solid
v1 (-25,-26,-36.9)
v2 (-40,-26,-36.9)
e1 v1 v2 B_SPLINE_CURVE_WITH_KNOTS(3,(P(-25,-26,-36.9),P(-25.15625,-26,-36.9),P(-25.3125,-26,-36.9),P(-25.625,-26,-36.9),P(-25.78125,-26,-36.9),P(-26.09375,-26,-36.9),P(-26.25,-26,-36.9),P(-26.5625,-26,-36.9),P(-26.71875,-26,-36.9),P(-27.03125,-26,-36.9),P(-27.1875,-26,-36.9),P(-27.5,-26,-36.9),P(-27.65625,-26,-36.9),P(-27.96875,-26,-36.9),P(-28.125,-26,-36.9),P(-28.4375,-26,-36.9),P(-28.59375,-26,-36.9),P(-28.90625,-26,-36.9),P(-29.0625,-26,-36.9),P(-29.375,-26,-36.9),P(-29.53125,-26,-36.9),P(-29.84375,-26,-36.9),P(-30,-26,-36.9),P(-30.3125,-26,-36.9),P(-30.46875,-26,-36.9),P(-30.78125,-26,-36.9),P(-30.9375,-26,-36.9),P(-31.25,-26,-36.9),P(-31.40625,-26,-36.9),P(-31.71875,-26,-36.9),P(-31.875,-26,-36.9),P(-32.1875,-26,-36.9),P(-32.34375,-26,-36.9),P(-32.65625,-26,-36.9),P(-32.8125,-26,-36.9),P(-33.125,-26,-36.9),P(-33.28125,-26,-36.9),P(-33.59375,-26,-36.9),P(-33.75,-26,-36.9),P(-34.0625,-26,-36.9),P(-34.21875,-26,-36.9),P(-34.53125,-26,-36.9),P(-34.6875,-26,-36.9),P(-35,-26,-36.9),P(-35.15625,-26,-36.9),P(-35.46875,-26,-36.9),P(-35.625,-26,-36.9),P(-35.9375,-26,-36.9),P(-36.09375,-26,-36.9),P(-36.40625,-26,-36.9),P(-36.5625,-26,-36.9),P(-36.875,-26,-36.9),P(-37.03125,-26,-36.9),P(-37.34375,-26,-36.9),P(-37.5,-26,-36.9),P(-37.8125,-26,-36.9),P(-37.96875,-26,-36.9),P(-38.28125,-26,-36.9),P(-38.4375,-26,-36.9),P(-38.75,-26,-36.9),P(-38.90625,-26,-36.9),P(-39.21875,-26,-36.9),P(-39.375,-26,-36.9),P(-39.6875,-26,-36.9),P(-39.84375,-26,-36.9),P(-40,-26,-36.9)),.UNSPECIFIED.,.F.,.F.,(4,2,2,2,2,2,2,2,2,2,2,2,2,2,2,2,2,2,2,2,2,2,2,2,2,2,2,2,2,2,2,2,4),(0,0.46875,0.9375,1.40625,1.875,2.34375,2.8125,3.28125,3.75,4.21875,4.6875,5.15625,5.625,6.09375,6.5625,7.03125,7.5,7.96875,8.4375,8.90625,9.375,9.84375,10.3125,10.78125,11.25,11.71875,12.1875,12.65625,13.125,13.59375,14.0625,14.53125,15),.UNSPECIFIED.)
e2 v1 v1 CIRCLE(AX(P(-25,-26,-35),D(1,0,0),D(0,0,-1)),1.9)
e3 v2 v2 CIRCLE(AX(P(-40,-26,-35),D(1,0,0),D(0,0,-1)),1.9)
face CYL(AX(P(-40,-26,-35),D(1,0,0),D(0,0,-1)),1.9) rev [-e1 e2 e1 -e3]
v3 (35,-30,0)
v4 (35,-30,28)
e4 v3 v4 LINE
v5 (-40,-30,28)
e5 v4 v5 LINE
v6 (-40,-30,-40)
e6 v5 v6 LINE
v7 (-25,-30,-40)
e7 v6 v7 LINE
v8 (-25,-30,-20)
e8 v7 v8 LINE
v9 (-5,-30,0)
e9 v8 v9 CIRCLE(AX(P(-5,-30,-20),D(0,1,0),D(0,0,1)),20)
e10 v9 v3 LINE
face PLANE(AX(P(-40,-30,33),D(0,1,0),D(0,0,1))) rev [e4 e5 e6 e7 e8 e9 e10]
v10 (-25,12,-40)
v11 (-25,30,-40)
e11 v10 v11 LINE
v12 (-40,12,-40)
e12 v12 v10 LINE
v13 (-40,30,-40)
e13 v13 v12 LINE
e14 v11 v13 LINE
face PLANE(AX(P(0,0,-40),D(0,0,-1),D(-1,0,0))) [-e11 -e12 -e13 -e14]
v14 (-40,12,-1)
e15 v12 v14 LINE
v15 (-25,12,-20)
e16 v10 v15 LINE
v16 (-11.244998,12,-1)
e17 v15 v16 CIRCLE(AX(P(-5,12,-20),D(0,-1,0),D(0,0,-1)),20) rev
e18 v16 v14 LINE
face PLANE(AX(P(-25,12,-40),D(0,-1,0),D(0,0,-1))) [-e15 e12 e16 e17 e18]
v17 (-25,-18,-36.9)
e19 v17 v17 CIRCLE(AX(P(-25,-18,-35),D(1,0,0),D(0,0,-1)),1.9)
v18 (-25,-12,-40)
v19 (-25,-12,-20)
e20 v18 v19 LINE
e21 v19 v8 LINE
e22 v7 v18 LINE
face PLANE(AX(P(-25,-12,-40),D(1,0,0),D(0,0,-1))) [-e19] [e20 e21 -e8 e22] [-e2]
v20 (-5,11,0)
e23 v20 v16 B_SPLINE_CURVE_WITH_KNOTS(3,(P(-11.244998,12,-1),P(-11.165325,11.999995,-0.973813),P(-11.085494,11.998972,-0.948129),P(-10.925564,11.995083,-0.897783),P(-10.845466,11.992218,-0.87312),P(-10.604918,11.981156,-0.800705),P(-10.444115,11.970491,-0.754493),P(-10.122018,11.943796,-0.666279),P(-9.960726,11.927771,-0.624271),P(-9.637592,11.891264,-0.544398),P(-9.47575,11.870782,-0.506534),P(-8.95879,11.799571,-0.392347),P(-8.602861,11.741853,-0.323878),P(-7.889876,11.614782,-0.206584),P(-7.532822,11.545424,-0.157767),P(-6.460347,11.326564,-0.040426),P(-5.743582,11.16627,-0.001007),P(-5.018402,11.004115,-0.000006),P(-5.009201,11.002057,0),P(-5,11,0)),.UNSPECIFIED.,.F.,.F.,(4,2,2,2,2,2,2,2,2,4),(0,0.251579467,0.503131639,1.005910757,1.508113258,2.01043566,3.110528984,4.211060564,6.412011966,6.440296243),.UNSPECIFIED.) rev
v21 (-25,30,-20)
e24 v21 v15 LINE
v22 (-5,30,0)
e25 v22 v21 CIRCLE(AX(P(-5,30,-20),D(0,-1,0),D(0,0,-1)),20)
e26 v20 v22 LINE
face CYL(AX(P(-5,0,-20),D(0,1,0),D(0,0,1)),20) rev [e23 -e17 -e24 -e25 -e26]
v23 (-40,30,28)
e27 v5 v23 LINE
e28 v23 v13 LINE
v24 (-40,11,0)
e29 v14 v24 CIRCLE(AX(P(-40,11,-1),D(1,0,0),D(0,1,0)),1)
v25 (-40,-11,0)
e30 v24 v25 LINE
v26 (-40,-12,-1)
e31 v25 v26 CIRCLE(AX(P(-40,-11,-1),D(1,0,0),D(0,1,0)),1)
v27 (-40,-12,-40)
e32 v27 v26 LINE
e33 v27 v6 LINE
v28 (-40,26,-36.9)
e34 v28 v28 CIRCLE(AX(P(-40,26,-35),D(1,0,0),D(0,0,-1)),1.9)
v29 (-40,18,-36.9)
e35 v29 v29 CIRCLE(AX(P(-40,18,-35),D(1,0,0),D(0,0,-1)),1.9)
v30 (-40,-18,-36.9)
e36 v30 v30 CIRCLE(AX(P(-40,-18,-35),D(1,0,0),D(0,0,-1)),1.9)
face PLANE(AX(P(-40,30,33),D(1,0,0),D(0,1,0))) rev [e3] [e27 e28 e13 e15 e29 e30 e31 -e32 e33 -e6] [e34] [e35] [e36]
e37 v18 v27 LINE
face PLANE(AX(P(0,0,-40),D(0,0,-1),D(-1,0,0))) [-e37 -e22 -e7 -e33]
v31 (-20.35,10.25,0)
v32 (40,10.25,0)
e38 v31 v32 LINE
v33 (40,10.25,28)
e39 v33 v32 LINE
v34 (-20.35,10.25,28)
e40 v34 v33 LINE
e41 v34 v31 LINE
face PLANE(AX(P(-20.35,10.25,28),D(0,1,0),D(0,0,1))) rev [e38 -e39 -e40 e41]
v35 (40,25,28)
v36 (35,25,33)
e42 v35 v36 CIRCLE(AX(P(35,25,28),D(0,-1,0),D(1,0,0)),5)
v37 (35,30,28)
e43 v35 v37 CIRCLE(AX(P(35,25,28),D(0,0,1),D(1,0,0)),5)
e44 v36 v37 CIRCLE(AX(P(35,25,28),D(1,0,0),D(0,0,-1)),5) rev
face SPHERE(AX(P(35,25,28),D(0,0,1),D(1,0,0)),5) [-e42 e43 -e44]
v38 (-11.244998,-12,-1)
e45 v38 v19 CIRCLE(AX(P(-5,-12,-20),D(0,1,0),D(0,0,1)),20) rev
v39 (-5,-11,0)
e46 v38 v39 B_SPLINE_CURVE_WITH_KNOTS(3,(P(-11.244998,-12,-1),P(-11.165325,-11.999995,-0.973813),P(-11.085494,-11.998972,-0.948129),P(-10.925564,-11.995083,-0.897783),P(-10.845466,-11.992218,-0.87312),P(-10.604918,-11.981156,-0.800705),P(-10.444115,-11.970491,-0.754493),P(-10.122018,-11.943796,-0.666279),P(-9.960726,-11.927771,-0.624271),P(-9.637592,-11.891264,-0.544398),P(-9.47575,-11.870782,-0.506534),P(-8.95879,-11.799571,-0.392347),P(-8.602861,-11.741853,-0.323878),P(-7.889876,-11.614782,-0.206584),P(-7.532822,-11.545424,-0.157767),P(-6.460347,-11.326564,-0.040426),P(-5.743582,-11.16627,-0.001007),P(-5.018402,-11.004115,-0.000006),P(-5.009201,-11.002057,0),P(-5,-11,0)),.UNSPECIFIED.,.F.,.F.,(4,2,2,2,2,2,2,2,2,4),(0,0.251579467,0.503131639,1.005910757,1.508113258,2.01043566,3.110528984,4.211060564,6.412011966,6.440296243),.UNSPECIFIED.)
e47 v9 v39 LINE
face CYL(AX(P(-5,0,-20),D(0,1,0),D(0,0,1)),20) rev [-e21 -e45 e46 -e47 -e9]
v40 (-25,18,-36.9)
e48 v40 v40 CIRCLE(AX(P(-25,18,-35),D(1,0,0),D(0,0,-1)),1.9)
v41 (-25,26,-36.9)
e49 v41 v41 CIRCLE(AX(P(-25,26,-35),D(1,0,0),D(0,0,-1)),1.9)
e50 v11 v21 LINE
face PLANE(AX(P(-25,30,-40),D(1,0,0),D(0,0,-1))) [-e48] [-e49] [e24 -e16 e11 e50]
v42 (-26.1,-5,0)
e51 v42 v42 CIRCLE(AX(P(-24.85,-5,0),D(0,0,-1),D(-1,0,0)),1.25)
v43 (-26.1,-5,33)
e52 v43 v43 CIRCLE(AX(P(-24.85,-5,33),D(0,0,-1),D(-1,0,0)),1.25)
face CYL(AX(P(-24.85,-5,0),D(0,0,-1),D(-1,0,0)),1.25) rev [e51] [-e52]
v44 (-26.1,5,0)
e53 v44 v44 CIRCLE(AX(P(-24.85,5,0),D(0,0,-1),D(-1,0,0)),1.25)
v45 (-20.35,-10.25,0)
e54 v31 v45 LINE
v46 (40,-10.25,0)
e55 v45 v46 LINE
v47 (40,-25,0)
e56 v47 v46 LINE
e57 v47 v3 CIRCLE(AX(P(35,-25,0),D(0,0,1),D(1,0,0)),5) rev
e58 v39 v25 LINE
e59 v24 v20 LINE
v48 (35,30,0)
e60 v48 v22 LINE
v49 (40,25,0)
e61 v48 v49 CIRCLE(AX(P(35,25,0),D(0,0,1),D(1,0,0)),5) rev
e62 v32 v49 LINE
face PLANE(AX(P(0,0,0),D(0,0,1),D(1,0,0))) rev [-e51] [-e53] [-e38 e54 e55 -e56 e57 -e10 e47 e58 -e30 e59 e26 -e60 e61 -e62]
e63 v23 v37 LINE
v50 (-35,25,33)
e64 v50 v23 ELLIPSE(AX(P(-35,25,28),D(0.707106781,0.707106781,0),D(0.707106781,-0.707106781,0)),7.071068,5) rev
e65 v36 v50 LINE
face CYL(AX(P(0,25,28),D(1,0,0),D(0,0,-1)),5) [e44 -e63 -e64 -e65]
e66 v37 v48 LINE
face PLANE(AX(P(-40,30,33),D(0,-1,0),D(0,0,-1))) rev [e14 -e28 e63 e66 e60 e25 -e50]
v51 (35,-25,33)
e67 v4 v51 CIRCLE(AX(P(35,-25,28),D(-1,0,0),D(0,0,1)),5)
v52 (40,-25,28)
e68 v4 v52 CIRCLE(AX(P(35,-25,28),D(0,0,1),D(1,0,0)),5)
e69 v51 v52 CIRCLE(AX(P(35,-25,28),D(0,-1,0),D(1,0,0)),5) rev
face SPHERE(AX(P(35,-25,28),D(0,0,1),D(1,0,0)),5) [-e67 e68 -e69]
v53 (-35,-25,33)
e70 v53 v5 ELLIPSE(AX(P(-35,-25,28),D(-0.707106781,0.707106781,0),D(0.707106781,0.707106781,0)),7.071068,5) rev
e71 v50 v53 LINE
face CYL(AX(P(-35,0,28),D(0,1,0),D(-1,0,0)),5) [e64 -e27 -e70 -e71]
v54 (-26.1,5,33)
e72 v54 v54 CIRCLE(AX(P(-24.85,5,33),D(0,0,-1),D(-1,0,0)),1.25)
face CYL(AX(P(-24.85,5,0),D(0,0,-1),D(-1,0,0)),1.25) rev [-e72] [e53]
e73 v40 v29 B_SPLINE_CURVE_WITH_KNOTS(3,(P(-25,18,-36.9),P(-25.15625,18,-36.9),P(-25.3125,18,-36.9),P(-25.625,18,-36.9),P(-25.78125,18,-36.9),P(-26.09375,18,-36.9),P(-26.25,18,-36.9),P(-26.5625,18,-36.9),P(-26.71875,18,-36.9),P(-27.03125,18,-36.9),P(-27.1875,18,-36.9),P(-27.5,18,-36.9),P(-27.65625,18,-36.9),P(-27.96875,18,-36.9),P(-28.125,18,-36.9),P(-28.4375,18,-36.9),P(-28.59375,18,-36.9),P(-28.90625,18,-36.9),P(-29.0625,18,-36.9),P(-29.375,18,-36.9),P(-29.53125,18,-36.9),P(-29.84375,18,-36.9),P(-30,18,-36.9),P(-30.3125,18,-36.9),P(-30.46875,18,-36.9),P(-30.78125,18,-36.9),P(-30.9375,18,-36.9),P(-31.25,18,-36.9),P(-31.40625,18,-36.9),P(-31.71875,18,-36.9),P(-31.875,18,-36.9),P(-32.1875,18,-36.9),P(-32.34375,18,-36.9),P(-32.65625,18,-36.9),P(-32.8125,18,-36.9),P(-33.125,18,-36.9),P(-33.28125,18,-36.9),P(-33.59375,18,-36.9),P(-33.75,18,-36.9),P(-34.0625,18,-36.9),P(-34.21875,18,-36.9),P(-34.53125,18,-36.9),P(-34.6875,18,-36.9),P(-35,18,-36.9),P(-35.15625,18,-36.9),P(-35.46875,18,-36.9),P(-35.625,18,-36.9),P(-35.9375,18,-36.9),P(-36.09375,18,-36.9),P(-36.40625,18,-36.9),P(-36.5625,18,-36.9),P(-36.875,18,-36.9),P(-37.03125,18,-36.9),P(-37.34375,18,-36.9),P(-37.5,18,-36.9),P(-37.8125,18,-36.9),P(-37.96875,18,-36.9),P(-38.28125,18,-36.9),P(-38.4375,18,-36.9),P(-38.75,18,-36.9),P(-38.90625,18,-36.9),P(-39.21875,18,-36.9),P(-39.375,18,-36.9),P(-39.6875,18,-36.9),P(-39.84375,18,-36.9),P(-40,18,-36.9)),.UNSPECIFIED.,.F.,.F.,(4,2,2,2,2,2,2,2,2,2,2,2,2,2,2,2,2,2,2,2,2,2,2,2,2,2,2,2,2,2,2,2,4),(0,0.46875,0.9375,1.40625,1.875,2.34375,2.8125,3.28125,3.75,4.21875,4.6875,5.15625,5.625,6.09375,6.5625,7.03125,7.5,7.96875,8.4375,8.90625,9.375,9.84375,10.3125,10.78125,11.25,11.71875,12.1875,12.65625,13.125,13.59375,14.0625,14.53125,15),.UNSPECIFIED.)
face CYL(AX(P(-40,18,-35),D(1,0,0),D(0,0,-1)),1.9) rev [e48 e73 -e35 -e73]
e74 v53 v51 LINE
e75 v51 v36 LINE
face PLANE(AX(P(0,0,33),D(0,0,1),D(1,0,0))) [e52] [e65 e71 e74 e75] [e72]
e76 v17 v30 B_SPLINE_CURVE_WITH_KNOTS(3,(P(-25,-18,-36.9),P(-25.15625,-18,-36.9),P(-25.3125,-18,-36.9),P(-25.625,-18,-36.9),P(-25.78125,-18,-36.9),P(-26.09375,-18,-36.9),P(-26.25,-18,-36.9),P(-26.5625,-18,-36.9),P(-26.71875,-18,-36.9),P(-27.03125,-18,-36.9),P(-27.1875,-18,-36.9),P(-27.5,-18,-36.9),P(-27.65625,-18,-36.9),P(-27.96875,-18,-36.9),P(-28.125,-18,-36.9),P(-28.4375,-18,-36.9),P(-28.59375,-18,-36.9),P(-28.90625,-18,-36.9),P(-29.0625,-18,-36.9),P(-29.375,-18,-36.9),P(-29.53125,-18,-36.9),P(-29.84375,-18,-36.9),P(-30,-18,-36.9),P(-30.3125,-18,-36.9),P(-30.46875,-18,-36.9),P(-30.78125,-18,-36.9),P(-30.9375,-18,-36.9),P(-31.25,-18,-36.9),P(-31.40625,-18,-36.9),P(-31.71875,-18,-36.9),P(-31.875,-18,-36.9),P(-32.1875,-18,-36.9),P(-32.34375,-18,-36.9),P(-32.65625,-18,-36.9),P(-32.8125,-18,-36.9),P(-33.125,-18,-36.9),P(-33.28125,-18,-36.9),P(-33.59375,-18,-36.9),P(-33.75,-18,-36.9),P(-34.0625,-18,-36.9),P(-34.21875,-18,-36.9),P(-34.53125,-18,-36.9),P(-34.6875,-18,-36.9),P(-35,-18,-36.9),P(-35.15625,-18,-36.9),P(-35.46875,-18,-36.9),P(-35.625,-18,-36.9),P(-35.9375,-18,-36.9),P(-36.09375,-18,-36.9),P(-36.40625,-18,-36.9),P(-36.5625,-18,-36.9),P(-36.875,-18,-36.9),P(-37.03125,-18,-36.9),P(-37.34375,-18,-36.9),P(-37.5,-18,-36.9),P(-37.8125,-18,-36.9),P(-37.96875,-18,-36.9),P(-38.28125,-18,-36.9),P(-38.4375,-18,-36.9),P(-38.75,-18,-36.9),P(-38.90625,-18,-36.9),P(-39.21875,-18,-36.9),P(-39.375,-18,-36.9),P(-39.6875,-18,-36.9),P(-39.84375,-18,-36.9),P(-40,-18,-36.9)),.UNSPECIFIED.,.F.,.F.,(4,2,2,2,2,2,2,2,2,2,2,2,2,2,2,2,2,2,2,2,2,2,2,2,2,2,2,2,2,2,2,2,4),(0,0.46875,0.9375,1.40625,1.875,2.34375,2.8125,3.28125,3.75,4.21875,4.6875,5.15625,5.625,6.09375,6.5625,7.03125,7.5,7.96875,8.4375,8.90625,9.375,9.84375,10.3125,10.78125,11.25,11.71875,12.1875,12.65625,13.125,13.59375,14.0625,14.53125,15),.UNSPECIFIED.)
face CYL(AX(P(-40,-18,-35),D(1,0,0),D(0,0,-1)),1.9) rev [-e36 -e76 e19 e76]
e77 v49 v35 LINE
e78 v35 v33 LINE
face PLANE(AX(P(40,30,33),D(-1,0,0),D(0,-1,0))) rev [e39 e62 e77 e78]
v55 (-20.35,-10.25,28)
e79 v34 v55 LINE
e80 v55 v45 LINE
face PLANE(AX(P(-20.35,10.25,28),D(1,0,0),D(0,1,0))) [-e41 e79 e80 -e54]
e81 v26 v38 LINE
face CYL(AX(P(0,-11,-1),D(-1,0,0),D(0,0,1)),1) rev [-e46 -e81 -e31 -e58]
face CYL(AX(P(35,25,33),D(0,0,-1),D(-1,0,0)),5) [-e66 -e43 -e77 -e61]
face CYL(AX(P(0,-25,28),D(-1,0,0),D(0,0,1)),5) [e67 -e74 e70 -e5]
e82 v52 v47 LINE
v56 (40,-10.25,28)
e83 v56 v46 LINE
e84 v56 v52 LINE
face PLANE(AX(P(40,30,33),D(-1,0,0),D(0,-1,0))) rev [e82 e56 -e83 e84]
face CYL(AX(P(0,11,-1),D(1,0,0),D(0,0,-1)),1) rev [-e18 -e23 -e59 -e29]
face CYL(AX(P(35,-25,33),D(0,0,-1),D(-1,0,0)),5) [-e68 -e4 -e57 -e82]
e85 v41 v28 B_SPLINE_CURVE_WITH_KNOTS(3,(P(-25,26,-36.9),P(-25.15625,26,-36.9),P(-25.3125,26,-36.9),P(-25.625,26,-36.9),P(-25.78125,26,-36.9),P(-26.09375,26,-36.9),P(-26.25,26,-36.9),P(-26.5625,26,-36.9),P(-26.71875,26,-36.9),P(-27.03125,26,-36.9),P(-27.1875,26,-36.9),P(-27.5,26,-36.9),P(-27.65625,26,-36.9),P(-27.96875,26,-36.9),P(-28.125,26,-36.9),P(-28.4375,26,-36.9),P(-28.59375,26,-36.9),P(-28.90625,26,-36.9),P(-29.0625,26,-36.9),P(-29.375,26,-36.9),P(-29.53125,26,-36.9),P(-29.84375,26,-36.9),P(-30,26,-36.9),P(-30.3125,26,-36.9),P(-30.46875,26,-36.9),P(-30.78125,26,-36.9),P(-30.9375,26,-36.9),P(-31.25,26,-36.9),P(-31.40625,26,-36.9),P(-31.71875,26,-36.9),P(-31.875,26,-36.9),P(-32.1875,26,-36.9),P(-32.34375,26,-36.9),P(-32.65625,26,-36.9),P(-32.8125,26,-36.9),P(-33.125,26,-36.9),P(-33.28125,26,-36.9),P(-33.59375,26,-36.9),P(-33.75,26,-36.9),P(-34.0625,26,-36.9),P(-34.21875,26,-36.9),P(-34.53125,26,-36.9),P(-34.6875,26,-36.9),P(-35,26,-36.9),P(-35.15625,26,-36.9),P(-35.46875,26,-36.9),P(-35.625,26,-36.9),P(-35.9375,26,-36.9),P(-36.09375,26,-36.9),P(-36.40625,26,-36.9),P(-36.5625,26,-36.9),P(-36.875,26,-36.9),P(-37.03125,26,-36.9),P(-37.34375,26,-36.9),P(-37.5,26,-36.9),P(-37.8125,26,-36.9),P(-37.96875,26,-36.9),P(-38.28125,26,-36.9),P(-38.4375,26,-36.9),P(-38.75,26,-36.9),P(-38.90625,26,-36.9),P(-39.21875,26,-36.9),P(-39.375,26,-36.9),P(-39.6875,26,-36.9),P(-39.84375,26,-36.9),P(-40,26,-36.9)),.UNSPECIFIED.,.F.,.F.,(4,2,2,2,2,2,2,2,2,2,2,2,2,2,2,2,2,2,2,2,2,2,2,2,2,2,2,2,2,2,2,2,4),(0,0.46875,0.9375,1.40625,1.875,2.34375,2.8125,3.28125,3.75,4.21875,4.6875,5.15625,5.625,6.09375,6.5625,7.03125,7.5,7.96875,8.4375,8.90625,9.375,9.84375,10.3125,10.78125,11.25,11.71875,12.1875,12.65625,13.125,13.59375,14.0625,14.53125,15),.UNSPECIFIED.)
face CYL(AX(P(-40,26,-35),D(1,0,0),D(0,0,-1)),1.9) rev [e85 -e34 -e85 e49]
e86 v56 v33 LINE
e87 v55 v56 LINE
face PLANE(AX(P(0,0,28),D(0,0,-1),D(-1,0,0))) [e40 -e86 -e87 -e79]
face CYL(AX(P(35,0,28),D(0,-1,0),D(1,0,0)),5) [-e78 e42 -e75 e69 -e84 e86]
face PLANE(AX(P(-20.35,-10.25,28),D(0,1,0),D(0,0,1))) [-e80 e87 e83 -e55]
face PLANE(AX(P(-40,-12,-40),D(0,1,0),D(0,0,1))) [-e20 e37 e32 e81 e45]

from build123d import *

# Parameters (mm, degrees)
SKETCH_2_W          = 80
SKETCH_2_H          = 60
EXTRUDE_2_DEPTH     = 33
SKETCH_3_W          = 40.7
SKETCH_3_H          = 20.5
CUT_EXTRUDE_1_DEPTH = 28
SKETCH_4_W          = 19.65
SKETCH_4_H          = 20.5
EXTRUDE_3_DEPTH     = 28
SKETCH_5_W          = 19.65
SKETCH_5_H          = 20.5
CUT_EXTRUDE_4_DEPTH = 28
SKETCH_10_W         = 15
SKETCH_10_H         = 18
EXTRUDE_6_DEPTH     = 40
M3X0_5_1_D          = 2.5
FILLET_2_R          = 20
FILLET_START        = -41
FILLET_7_DEPTH      = 81
FILLET_START_2      = -31
FILLET_7_2_DEPTH    = 62
FILLET_8_R          = 5
FILLET_10_R         = 1
M3X0_5_2_D          = 2.5
SKETCH_15_R         = 1.9
CUT_EXTRUDE_7_DEPTH = 65.031242484


with BuildPart() as part:
    # ｽｹｯﾁ2 → ﾎﾞｽ - 押し出し2 (new body)
    with BuildSketch(Plane.XY):
        Rectangle(SKETCH_2_W, SKETCH_2_H)
    extrude(amount=EXTRUDE_2_DEPTH)

    # ｽｹｯﾁ3 → ｶｯﾄ - 押し出し1 (cut)
    with BuildSketch(Plane.XY):
        Rectangle(SKETCH_3_W, SKETCH_3_H)
    extrude(amount=CUT_EXTRUDE_1_DEPTH, mode=Mode.SUBTRACT)

    # ｽｹｯﾁ4 → ﾎﾞｽ - 押し出し3 (add)
    with BuildSketch(Plane.XY):
        with Locations((30.175, 0)):
            Rectangle(SKETCH_4_W, SKETCH_4_H)
    extrude(amount=EXTRUDE_3_DEPTH)

    # ｽｹｯﾁ5 → ｶｯﾄ - 押し出し4 (cut)
    with BuildSketch(Plane.XY):
        with Locations((30.175, 0)):
            Rectangle(SKETCH_5_W, SKETCH_5_H)
    extrude(amount=CUT_EXTRUDE_4_DEPTH, mode=Mode.SUBTRACT)

    # ｽｹｯﾁ10 → ﾎﾞｽ - 押し出し6 (add)
    with BuildSketch(Plane.XY):
        with Locations((-32.5, 21)):
            Rectangle(SKETCH_10_W, SKETCH_10_H)
        with Locations((-32.5, -21)):
            Rectangle(SKETCH_10_W, SKETCH_10_H)
    extrude(amount=-EXTRUDE_6_DEPTH)

    # M3x0.5 ねじ穴1 (through all)
    with Locations(Plane(origin=(-25, 0, 0), x_dir=(0, 0, -1), z_dir=(1, 0, 0))):
        with Locations((35, 18), (35, -18), (35, 26), (35, -26)):
            Hole(M3X0_5_1_D / 2)

    # ﾌｨﾚｯﾄ2
    fillet_2_edges = [part.edges().sort_by_distance(p)[0] for p in [
        (-25, 21, 0),
        (-25, -21, 0),
    ]]
    fillet(fillet_2_edges, radius=FILLET_2_R)

    # ﾌｨﾚｯﾄ7: read off the stored shape, not the designer's step
    # ﾌｨﾚｯﾄ7 outline → ﾌｨﾚｯﾄ7 (cut)
    with BuildSketch(Plane.YZ.offset(FILLET_START)):
        with BuildLine():
            ThreePointArc((-30, 28), (-28.535533906, 31.535533906), (-25, 33))
            Line((-25, 33), (-30, 33))
            Line((-30, 33), (-30, 28))
        make_face()
        with BuildLine():
            ThreePointArc((25, 33), (28.535533906, 31.535533906), (30, 28))
            Line((30, 28), (30, 33))
            Line((30, 33), (25, 33))
        make_face()
    extrude(amount=FILLET_7_DEPTH, mode=Mode.SUBTRACT)

    # Fillet 7 2 outline → Fillet 7 2 (cut)
    with BuildSketch(Plane(origin=(0, 0, 0), x_dir=(1, 0, 0), z_dir=(0, 1, 0)).offset(FILLET_START_2)):
        with BuildLine():
            ThreePointArc((40, -28), (38.535533906, -31.535533906), (35, -33))
            Line((35, -33), (40, -33))
            Line((40, -33), (40, -28))
        make_face()
        with BuildLine():
            ThreePointArc((-35, -33), (-38.535533906, -31.535533906), (-40, -28))
            Line((-40, -28), (-40, -33))
            Line((-40, -33), (-35, -33))
        make_face()
    extrude(amount=FILLET_7_2_DEPTH, mode=Mode.SUBTRACT)

    # ﾌｨﾚｯﾄ8
    # the kernel refuses this fillet: 5 mm, written as the material it takes off along each edge
    with BuildSketch(Plane(origin=(35, 25, 28), x_dir=(1, 0, 0), z_dir=(0, 1, 0))) as fillet_8_piece_1_section:
        Polygon((0, 0), (FILLET_8_R, 0), (FILLET_8_R, -FILLET_8_R), (0, -FILLET_8_R), align=None)
    fillet_8_piece_1 = extrude(amount=FILLET_8_R, mode=Mode.PRIVATE)
    fillet_8_piece_1 = fillet_8_piece_1 - Plane(origin=(35, 25, 28), x_dir=(-0.7071067811865475, 0, -0.7071067811865475), z_dir=(0, 1, 0)) * Sphere(FILLET_8_R, mode=Mode.PRIVATE)
    add(fillet_8_piece_1, mode=Mode.SUBTRACT)
    with BuildSketch(Plane(origin=(35, -25, 28), x_dir=(0, -1, 0), z_dir=(1, 0, 0))) as fillet_8_piece_2_section:
        Polygon((0, 0), (FILLET_8_R, 0), (FILLET_8_R, -FILLET_8_R), (0, -FILLET_8_R), align=None)
    fillet_8_piece_2 = extrude(amount=FILLET_8_R, mode=Mode.PRIVATE)
    fillet_8_piece_2 = fillet_8_piece_2 - Plane(origin=(35, -25, 28), x_dir=(0, 0.7071067811865475, -0.7071067811865475), z_dir=(1, 0, 0)) * Sphere(FILLET_8_R, mode=Mode.PRIVATE)
    add(fillet_8_piece_2, mode=Mode.SUBTRACT)
    with BuildSketch(Plane(origin=(40, -30, -12.5), x_dir=(0, 1, 0), z_dir=(0, 0, 1)), Plane(origin=(40, 30, -12.5), x_dir=(-1, 0, 0), z_dir=(0, 0, 1))) as fillet_8_piece_3:
        with BuildLine():
            CenterArc((FILLET_8_R, FILLET_8_R), FILLET_8_R, 180, 90)
            Line((0, FILLET_8_R), (0, 0))
            Line((0, 0), (FILLET_8_R, 0))
        make_face()
    extrude(amount=40.5, mode=Mode.SUBTRACT)

    # ﾌｨﾚｯﾄ10
    fillet_10_edges = [part.edges().sort_by_distance(p)[0] for p in [
        (-22.5, 12, 0),
        (-22.5, -12, 0),
    ]]
    fillet(fillet_10_edges, radius=FILLET_10_R)

    # M3x0.5 ねじ穴2 (through all)
    with Locations(Plane(origin=(0, 0, 0), x_dir=(-1, 0, 0), z_dir=(0, 0, -1))):
        with Locations((24.85, 5), (24.85, -5)):
            Hole(M3X0_5_2_D / 2)

    # ｽｹｯﾁ15 → ｶｯﾄ - 押し出し7 (cut, through all)
    with BuildSketch(Plane(origin=(0, 0, 0), x_dir=(0, 0, -1), z_dir=(1, 0, 0))):
        with Locations((35, 26)):
            Circle(SKETCH_15_R)
        with Locations((35, 18)):
            Circle(SKETCH_15_R)
        with Locations((35, -18)):
            Circle(SKETCH_15_R)
        with Locations((35, -26)):
            Circle(SKETCH_15_R)
    extrude(amount=-CUT_EXTRUDE_7_DEPTH, mode=Mode.SUBTRACT)


solid = part.part
